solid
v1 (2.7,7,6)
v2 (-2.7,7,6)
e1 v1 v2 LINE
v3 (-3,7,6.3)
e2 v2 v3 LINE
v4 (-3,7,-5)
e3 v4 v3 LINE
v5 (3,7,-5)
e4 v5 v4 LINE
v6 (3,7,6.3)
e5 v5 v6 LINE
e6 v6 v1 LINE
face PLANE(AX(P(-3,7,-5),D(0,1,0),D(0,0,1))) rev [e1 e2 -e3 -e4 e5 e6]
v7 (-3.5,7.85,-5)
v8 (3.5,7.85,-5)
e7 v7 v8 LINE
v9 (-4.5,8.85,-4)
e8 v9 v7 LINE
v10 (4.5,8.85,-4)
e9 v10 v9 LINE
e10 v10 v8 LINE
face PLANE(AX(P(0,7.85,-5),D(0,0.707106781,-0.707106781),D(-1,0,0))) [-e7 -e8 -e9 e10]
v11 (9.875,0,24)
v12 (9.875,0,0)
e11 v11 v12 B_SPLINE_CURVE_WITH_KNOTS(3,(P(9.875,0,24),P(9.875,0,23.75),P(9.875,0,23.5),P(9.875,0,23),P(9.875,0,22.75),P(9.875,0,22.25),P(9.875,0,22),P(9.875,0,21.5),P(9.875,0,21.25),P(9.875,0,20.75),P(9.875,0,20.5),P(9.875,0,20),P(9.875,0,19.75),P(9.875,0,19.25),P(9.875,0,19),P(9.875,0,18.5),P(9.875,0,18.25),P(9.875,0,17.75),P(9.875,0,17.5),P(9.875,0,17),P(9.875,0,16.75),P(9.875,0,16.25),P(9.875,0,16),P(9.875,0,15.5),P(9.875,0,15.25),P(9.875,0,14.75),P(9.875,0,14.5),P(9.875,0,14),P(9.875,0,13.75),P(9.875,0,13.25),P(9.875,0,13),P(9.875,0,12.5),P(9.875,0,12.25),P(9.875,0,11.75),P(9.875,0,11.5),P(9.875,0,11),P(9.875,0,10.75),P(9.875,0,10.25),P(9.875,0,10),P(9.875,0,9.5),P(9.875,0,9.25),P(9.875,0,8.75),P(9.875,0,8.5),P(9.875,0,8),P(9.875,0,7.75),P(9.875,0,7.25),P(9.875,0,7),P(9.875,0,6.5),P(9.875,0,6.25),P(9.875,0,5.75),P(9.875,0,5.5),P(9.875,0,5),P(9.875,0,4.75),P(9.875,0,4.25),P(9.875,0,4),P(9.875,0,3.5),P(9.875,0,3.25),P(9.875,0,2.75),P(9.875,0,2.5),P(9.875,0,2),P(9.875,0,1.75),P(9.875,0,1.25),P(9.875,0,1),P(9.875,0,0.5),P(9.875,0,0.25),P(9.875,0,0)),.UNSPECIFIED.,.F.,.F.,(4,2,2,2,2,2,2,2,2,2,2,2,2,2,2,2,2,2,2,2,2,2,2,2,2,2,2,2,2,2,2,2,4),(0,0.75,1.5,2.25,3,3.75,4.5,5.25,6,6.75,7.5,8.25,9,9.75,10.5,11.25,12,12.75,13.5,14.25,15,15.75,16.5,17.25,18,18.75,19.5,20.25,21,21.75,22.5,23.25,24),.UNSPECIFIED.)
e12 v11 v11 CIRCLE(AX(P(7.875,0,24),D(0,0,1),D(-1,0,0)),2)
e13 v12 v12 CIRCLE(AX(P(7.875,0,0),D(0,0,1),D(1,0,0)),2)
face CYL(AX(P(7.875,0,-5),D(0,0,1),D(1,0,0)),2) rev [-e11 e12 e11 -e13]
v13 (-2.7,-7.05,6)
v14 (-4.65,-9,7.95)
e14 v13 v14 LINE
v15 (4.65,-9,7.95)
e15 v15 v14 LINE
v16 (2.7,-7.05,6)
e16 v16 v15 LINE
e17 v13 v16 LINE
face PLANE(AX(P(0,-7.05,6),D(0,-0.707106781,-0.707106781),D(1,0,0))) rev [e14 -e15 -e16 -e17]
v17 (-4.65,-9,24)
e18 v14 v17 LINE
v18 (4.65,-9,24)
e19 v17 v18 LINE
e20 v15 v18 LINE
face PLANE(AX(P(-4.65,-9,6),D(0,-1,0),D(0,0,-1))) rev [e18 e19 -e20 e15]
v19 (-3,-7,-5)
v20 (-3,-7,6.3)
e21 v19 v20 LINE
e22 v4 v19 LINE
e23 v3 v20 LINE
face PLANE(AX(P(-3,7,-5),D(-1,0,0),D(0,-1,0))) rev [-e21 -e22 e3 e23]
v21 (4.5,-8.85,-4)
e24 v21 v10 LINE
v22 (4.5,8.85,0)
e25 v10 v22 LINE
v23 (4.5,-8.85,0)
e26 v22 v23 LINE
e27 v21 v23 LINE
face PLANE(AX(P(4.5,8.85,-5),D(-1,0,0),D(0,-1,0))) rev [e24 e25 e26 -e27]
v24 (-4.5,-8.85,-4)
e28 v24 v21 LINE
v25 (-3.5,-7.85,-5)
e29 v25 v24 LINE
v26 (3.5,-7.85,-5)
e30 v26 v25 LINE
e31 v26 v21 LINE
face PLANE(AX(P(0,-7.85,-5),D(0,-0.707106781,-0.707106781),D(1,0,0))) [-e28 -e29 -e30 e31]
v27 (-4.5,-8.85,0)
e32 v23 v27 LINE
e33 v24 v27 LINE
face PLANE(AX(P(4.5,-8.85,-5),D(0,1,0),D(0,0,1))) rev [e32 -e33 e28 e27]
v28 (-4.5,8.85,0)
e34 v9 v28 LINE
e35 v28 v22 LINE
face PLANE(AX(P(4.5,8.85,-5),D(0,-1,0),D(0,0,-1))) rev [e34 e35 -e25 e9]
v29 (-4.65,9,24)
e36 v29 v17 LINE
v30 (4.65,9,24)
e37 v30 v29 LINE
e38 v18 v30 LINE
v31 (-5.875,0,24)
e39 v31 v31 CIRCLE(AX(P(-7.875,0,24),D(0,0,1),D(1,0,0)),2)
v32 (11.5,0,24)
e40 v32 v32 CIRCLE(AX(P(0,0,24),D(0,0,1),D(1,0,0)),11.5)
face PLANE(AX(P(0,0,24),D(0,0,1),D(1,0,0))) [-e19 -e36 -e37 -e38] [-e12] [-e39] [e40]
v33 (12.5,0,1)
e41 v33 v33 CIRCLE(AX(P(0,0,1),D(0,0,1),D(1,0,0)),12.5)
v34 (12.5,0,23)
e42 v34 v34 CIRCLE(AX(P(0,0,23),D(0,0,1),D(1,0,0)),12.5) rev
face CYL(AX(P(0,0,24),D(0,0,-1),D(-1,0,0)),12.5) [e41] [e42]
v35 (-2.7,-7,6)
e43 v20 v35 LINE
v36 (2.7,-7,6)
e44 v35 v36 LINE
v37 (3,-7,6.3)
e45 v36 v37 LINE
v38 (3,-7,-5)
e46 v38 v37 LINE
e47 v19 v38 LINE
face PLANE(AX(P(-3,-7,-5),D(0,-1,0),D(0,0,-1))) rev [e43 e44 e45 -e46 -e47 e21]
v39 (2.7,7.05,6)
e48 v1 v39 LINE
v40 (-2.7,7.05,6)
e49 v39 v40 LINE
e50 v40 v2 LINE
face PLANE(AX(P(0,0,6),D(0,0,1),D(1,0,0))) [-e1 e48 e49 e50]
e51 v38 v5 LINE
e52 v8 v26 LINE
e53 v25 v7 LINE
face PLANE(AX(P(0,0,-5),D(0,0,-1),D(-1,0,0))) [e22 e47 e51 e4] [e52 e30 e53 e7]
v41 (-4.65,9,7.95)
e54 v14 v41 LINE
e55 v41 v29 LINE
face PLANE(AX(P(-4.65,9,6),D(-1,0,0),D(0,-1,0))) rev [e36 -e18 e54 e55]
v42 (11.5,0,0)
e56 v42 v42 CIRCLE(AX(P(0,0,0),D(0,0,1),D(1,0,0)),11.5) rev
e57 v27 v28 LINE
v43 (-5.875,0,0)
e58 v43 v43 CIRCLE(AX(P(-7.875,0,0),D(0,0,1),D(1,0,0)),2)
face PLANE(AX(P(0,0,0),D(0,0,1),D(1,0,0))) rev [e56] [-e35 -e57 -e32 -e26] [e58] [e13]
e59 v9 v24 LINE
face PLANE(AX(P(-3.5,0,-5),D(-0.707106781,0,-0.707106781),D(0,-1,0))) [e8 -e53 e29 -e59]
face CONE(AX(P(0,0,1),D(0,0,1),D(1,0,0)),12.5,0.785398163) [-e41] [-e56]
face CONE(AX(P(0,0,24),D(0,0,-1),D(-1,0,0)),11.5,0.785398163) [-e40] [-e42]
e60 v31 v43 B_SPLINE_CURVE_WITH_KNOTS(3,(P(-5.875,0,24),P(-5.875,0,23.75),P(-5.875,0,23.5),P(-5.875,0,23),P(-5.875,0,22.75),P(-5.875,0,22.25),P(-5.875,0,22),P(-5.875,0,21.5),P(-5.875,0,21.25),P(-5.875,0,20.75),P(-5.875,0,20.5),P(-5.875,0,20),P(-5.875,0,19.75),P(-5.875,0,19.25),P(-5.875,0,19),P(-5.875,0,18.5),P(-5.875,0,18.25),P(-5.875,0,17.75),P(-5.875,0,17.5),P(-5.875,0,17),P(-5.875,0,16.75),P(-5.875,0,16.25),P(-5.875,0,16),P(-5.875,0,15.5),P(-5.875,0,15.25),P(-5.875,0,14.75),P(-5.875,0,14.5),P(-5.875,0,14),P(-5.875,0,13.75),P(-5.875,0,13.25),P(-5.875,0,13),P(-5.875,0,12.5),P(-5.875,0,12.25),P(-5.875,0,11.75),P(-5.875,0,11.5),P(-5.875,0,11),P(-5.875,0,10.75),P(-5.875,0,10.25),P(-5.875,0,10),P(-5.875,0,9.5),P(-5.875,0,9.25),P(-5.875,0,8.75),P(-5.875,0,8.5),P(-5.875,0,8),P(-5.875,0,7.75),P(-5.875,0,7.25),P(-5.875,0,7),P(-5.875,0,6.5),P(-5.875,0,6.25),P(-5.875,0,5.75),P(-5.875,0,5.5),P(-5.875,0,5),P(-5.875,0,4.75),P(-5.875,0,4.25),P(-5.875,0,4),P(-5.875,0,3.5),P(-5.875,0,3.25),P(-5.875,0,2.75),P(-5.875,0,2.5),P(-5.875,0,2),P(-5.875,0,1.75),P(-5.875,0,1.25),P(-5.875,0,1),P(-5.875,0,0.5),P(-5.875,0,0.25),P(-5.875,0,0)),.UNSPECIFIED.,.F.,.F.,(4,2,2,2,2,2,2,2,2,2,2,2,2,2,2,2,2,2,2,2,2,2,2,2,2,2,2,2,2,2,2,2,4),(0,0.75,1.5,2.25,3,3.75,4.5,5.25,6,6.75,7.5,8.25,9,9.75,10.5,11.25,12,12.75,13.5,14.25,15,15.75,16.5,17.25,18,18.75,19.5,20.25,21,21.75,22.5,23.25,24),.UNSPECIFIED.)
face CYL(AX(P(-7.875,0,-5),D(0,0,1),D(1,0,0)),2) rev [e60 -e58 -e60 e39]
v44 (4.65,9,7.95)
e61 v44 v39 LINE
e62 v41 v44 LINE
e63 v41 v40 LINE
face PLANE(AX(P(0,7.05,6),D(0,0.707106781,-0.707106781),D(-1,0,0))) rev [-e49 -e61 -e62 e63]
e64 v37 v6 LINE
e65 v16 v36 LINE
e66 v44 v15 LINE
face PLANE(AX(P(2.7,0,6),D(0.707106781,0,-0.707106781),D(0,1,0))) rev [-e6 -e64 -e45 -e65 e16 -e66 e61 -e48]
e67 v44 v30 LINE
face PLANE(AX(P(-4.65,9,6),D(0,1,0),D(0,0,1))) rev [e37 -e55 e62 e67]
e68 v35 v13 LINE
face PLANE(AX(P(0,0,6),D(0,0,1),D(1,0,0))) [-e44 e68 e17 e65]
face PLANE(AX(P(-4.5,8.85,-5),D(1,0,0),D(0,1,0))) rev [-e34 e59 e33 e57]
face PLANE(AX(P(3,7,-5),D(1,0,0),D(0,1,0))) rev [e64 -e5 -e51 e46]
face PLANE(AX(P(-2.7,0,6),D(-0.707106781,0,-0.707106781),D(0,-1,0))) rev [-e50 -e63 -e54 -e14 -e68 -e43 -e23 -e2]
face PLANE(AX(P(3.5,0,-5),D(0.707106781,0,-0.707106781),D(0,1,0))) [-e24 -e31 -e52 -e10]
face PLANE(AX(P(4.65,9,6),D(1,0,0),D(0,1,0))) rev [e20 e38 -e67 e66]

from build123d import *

# Parameters (mm, degrees)
CROQUIS1_R              = 12.5
SALIENTE_EXTRUIR1_DEPTH = 24
CROQUIS2_W              = 9.3
CROQUIS2_H              = 18
CORTAR_EXTRUIR1_DEPTH   = 18
CROQUIS3_W              = 9
CROQUIS3_H              = 17.7
SALIENTE_EXTRUIR2_DEPTH = 5
CHAFL_N1_SIZE           = 1
CHAFL_N2_SIZE           = 1
CROQUIS4_R              = 2
CORTAR_EXTRUIR2_DEPTH   = 34.963215395
CHAFL_N3_SIZE           = 1
CROQUIS5_W              = 6
CROQUIS5_H              = 14
CORTAR_EXTRUIR3_DEPTH   = 26.228951623
CHAFL_N4_SIZE           = 1.95


with BuildPart() as part:
    # Croquis1 → Saliente-Extruir1 (new body)
    with BuildSketch(Plane.XY):
        Circle(CROQUIS1_R)
    extrude(amount=SALIENTE_EXTRUIR1_DEPTH)

    # Croquis2 → Cortar-Extruir1 (cut)
    with BuildSketch(Plane.XY.offset(24)):
        Rectangle(CROQUIS2_W, CROQUIS2_H)
    extrude(amount=-CORTAR_EXTRUIR1_DEPTH, mode=Mode.SUBTRACT)

    # Croquis3 → Saliente-Extruir2 (add)
    with BuildSketch(Plane(origin=(0, 0, 0), x_dir=(-1, 0, 0), z_dir=(0, 0, -1))):
        Rectangle(CROQUIS3_W, CROQUIS3_H)
    extrude(amount=SALIENTE_EXTRUIR2_DEPTH)

    # Chaflán1
    chafl_n1_edges = [part.edges().sort_by_distance(p)[0] for p in [
        (-4.5, 0, -5),
        (0, 8.85, -5),
        (4.5, 0, -5),
        (0, -8.85, -5),
    ]]
    chamfer(chafl_n1_edges, length=CHAFL_N1_SIZE)

    # Chaflán2
    chafl_n2_edges = [part.edges().sort_by_distance(p)[0] for p in [
        (-12.5, 0, 0),
    ]]
    chamfer(chafl_n2_edges, length=CHAFL_N2_SIZE)

    # Croquis4 → Cortar-Extruir2 (cut, through all)
    with BuildSketch(Plane.XY.offset(24)):
        with Locations((-7.875, 0)):
            Circle(CROQUIS4_R)
        with Locations((7.875, 0)):
            Circle(CROQUIS4_R)
    extrude(amount=-CORTAR_EXTRUIR2_DEPTH, mode=Mode.SUBTRACT)

    # Chaflán3
    chafl_n3_edges = [part.edges().sort_by_distance(p)[0] for p in [
        (-12.5, 0, 24),
    ]]
    chamfer(chafl_n3_edges, length=CHAFL_N3_SIZE)

    # Croquis5 → Cortar-Extruir3 (cut, through all)
    with BuildSketch(Plane.XY.offset(6)):
        Rectangle(CROQUIS5_W, CROQUIS5_H)
    extrude(amount=-CORTAR_EXTRUIR3_DEPTH, mode=Mode.SUBTRACT)

    # Chaflán4
    # the kernel refuses this chamfer: 1.95 mm, written as the material it adds along each edge
    with BuildSketch(Plane(origin=(4.65, 9, 6), x_dir=(0.02749587661058626, 0, 0.9996219169112968), z_dir=(0, -1, 0))) as chafl_n4_piece_1_section:
        Polygon((CHAFL_N4_SIZE * 0.999621916911, CHAFL_N4_SIZE * 0.0274958766106), (-CHAFL_N4_SIZE * 0.0274958766106, CHAFL_N4_SIZE * 0.999621916911), (0, 0), align=None)
    chafl_n4_piece_1 = extrude(amount=18, mode=Mode.PRIVATE)
    chafl_n4_piece_1 = split(chafl_n4_piece_1, bisect_by=Plane(origin=(3, 8, 6.663333333), z_dir=(1, 0, 0)), keep=Keep.TOP, mode=Mode.PRIVATE)
    add(chafl_n4_piece_1)
    with BuildSketch(Plane(origin=(4.65, 9, 6), x_dir=(0.02749587661058626, 0, 0.9996219169112968), z_dir=(0, -1, 0))) as chafl_n4_piece_2_section:
        Polygon((CHAFL_N4_SIZE * 0.999621916911, CHAFL_N4_SIZE * 0.0274958766106), (-CHAFL_N4_SIZE * 0.0274958766106, CHAFL_N4_SIZE * 0.999621916911), (0, 0), align=None)
    chafl_n4_piece_2 = extrude(amount=23.014781827, mode=Mode.PRIVATE)
    chafl_n4_piece_2 = split(chafl_n4_piece_2, bisect_by=Plane(origin=(2.9, 7, 6.1), z_dir=(0, 1, 0)), keep=Keep.TOP, mode=Mode.PRIVATE)
    add(chafl_n4_piece_2)
    with BuildSketch(Plane(origin=(4.65, 14.014781827, 6), x_dir=(0.02749587661058626, 0, 0.9996219169112968), z_dir=(0, -1, 0))) as chafl_n4_piece_3_section:
        Polygon((CHAFL_N4_SIZE * 0.999621916911, CHAFL_N4_SIZE * 0.0274958766106), (-CHAFL_N4_SIZE * 0.0274958766106, CHAFL_N4_SIZE * 0.999621916911), (0, 0), align=None)
    chafl_n4_piece_3 = extrude(amount=23.014781827, mode=Mode.PRIVATE)
    chafl_n4_piece_3 = split(chafl_n4_piece_3, bisect_by=Plane(origin=(2.9, -7, 6.1), z_dir=(0, -1, 0)), keep=Keep.TOP, mode=Mode.PRIVATE)
    add(chafl_n4_piece_3)
    with BuildSketch(Plane(origin=(-4.65, 9, 6), x_dir=(0, 0.02749587661058626, 0.9996219169112968), z_dir=(1, 0, 0)), Plane(origin=(4.65, -9, 6), x_dir=(0, -0.02749587661058626, 0.9996219169112968), z_dir=(-1, 0, 0))) as chafl_n4_piece_4:
        Polygon((CHAFL_N4_SIZE * 0.999621916911, CHAFL_N4_SIZE * 0.0274958766106), (-CHAFL_N4_SIZE * 0.0274958766106, CHAFL_N4_SIZE * 0.999621916911), (0, 0), align=None)
    extrude(amount=9.3)
    with BuildSketch(Plane(origin=(-4.65, -9, 6), x_dir=(-0.02749587661058626, 0, 0.9996219169112968), z_dir=(0, 1, 0))) as chafl_n4_piece_5_section:
        Polygon((CHAFL_N4_SIZE * 0.999621916911, CHAFL_N4_SIZE * 0.0274958766106), (-CHAFL_N4_SIZE * 0.0274958766106, CHAFL_N4_SIZE * 0.999621916911), (0, 0), align=None)
    chafl_n4_piece_5 = extrude(amount=18, mode=Mode.PRIVATE)
    chafl_n4_piece_5 = split(chafl_n4_piece_5, bisect_by=Plane(origin=(-3, -8, 6.663333333), z_dir=(-1, 0, 0)), keep=Keep.TOP, mode=Mode.PRIVATE)
    add(chafl_n4_piece_5)
    with BuildSketch(Plane(origin=(-4.65, -9, 6), x_dir=(-0.02749587661058626, 0, 0.9996219169112968), z_dir=(0, 1, 0))) as chafl_n4_piece_6_section:
        Polygon((CHAFL_N4_SIZE * 0.999621916911, CHAFL_N4_SIZE * 0.0274958766106), (-CHAFL_N4_SIZE * 0.0274958766106, CHAFL_N4_SIZE * 0.999621916911), (0, 0), align=None)
    chafl_n4_piece_6 = extrude(amount=23.014781827, mode=Mode.PRIVATE)
    chafl_n4_piece_6 = split(chafl_n4_piece_6, bisect_by=Plane(origin=(-2.9, -7, 6.1), z_dir=(0, -1, 0)), keep=Keep.TOP, mode=Mode.PRIVATE)
    add(chafl_n4_piece_6)
    with BuildSketch(Plane(origin=(-4.65, -14.014781827, 6), x_dir=(-0.02749587661058626, 0, 0.9996219169112968), z_dir=(0, 1, 0))) as chafl_n4_piece_7_section:
        Polygon((CHAFL_N4_SIZE * 0.999621916911, CHAFL_N4_SIZE * 0.0274958766106), (-CHAFL_N4_SIZE * 0.0274958766106, CHAFL_N4_SIZE * 0.999621916911), (0, 0), align=None)
    chafl_n4_piece_7 = extrude(amount=23.014781827, mode=Mode.PRIVATE)
    chafl_n4_piece_7 = split(chafl_n4_piece_7, bisect_by=Plane(origin=(-2.9, 7, 6.1), z_dir=(0, 1, 0)), keep=Keep.TOP, mode=Mode.PRIVATE)
    add(chafl_n4_piece_7)


solid = part.part
